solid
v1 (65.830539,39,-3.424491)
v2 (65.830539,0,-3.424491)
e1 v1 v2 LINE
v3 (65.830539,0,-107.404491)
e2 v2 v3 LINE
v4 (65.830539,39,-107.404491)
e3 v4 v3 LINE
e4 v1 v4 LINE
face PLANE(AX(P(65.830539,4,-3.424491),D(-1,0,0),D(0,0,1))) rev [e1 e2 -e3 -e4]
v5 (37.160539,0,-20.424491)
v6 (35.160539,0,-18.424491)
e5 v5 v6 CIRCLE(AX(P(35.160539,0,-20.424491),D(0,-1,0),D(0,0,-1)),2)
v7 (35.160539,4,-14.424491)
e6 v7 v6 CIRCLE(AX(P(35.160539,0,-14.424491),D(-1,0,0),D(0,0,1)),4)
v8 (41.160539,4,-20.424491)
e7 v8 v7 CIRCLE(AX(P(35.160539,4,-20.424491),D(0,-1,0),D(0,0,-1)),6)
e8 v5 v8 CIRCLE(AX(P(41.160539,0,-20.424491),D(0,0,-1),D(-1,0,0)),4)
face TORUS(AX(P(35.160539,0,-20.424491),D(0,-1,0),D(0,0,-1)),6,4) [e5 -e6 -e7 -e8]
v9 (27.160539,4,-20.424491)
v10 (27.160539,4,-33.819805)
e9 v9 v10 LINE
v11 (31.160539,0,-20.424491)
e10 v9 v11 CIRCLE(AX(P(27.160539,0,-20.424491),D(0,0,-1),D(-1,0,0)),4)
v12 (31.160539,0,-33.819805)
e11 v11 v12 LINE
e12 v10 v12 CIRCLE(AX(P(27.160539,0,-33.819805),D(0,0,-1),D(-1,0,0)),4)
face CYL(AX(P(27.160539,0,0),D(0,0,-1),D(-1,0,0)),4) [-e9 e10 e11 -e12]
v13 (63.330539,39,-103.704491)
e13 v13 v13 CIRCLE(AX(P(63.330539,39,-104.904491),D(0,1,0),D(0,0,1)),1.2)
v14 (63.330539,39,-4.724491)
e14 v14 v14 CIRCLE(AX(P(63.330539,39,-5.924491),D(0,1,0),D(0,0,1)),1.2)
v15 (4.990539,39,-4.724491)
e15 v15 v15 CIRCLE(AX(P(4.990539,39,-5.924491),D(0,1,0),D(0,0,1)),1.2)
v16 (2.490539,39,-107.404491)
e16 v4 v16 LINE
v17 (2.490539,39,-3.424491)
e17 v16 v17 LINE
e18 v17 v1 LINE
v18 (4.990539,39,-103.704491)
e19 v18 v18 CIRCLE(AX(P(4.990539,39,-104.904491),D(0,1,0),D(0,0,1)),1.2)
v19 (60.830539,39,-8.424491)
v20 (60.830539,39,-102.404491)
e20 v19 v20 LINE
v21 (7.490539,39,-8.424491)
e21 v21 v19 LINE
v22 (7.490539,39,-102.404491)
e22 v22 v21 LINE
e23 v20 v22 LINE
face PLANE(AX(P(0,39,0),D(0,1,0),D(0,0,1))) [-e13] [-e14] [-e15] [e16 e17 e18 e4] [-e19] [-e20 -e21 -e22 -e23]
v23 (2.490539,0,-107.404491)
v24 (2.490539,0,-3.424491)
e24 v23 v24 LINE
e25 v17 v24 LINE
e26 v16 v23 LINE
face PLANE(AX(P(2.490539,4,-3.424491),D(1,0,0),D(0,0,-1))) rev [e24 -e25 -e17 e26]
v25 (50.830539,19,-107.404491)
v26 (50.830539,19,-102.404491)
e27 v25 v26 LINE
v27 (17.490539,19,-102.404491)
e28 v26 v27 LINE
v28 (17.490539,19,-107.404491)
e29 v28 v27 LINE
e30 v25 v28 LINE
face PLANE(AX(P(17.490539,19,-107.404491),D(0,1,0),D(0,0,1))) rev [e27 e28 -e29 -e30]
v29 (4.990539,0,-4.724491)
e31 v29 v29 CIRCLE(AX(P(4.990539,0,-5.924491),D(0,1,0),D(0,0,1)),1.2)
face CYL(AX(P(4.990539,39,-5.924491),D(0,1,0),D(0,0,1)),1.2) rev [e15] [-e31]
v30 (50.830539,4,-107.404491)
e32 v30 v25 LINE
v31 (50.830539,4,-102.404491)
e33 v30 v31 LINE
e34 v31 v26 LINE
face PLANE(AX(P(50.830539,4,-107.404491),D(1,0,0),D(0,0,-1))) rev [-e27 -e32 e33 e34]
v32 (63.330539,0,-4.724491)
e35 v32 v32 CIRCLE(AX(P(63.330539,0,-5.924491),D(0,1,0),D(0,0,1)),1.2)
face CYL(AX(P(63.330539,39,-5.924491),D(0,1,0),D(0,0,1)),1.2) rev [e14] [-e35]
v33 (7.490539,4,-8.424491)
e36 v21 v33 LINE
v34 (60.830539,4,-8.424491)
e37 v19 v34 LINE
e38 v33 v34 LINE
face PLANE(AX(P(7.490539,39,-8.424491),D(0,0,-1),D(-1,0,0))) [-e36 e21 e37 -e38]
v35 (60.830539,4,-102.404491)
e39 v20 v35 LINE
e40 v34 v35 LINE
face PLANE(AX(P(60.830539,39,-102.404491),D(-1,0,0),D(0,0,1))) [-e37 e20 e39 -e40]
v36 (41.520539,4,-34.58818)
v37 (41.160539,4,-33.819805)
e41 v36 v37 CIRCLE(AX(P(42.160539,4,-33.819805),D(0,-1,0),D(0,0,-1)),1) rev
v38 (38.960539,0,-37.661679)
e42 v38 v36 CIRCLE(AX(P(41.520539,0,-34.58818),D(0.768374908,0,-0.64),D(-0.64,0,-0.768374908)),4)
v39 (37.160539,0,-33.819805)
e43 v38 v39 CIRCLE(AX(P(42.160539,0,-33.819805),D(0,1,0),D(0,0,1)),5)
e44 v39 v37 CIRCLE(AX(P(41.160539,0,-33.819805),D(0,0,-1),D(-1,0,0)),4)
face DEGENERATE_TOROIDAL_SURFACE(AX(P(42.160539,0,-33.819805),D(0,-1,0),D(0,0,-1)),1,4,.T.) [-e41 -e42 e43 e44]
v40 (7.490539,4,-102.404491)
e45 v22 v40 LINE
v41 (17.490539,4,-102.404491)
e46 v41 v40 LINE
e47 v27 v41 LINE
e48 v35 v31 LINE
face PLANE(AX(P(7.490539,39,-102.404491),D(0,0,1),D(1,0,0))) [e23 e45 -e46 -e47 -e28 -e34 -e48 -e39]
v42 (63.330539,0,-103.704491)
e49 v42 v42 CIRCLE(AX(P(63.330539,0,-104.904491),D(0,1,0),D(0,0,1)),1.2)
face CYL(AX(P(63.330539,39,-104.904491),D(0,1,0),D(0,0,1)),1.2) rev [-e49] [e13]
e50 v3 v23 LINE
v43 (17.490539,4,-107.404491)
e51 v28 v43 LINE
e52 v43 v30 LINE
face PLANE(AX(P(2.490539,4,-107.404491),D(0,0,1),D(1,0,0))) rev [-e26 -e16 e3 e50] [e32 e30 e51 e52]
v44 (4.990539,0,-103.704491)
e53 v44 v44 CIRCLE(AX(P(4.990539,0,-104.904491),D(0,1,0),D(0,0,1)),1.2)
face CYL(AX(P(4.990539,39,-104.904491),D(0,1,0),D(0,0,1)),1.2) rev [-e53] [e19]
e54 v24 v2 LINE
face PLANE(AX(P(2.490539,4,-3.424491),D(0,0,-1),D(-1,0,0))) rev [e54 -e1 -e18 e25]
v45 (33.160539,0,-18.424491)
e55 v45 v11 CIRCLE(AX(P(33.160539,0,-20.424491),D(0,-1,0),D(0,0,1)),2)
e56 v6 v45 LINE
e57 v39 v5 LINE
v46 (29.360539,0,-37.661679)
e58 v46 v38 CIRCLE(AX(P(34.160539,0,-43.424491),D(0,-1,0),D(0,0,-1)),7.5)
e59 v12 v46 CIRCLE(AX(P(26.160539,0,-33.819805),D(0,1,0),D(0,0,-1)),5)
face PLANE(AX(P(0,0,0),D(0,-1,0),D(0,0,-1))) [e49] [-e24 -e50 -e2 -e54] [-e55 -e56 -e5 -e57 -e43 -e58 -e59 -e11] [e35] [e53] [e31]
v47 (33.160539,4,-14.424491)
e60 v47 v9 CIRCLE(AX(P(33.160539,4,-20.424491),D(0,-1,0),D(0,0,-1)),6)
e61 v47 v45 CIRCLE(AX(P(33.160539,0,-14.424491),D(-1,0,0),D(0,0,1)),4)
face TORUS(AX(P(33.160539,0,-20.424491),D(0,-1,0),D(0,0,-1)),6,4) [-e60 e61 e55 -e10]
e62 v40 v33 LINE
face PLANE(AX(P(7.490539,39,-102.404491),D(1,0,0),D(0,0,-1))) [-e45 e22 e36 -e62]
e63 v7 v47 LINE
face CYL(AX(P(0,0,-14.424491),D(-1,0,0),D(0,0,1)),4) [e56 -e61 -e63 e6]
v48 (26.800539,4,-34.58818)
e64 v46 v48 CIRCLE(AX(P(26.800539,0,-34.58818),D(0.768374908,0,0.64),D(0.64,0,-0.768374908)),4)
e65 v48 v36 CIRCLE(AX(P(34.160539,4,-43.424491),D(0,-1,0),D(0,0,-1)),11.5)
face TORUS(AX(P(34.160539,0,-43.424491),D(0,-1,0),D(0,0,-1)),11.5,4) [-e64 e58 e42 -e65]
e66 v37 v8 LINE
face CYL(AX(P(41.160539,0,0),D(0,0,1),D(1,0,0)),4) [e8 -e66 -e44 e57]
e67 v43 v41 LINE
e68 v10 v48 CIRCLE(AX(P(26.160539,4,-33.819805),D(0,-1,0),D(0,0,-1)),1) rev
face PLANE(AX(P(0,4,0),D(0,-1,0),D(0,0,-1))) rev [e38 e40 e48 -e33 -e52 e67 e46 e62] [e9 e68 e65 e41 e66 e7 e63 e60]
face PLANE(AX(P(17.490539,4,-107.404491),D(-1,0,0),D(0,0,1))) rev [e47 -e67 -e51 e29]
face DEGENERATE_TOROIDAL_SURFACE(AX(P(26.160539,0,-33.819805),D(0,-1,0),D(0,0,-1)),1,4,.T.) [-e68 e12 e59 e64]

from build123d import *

# Parameters (mm, degrees)
SCHIZZO1_W                   = 63.34
SCHIZZO1_H                   = 103.98
ESTRUSIONE_ESTRUSIONE1_DEPTH = 4
SCHIZZO2_W                   = 63.34
SCHIZZO2_H                   = 103.98
SCHIZZO2_W_2                 = 53.34
SCHIZZO2_H_2                 = 93.98
ESTRUSIONE_ESTRUSIONE2_DEPTH = 35
FORO_PER_VITE_M2_1_D         = 2.4
SCHIZZO5_W                   = 33.34
SCHIZZO5_H                   = 15
TAGLIO_ESTRUSIONE1_DEPTH     = 126.106755432
TAGLIO_ESTRUSIONE2_DEPTH     = 132.87260726
RACCORDO1_R                  = 4


with BuildPart() as part:
    # Schizzo1 → Estrusione-Estrusione1 (new body)
    with BuildSketch(Plane(origin=(0, 0, 0), x_dir=(1, 0, 0), z_dir=(0, 1, 0))):
        with Locations((34.160538922, 55.414491018)):
            Rectangle(SCHIZZO1_W, SCHIZZO1_H)
    extrude(amount=ESTRUSIONE_ESTRUSIONE1_DEPTH)

    # Schizzo2 → Estrusione-Estrusione2 (add)
    with BuildSketch(Plane(origin=(0, 4, 0), x_dir=(1, 0, 0), z_dir=(0, 1, 0))):
        with Locations((34.160538922, 55.414491018)):
            Rectangle(SCHIZZO2_W, SCHIZZO2_H)
        with Locations((34.160538922, 55.414491018)):
            Rectangle(SCHIZZO2_W_2, SCHIZZO2_H_2, mode=Mode.SUBTRACT)
    extrude(amount=ESTRUSIONE_ESTRUSIONE2_DEPTH)

    # Foro per Vite M2-1 (through all)
    with Locations(Plane(origin=(0, 39, 0), x_dir=(1, 0, 0), z_dir=(0, 1, 0))):
        with Locations((4.990538922, 104.904491018), (63.330538922, 104.904491018), (63.330538922, 5.924491018), (4.990538922, 5.924491018)):
            Hole(FORO_PER_VITE_M2_1_D / 2)

    # Schizzo5 → Taglio-Estrusione1 (cut, through all)
    with BuildSketch(Plane.XY.offset(-102.404491018)):
        with Locations((34.160538922, 11.5)):
            Rectangle(SCHIZZO5_W, SCHIZZO5_H)
    extrude(amount=-TAGLIO_ESTRUSIONE1_DEPTH, mode=Mode.SUBTRACT)

    # Schizzo6 → Taglio-Estrusione2 (cut, through all)
    with BuildSketch(Plane(origin=(0, 0, 0), x_dir=(-1, 0, 0), z_dir=(0, -1, 0))):
        with BuildLine():
            Line((-31.160538922, 33.819804662), (-31.160538922, 20.424491018))
            ThreePointArc((-31.160538922, 20.424491018), (-31.74632536, 19.010277456), (-33.160538922, 18.424491018))
            Line((-33.160538922, 18.424491018), (-35.160538922, 18.424491018))
            ThreePointArc((-35.160538922, 18.424491018), (-36.574752485, 19.010277456), (-37.160538922, 20.424491018))
            Line((-37.160538922, 20.424491018), (-37.160538922, 33.819804662))
            ThreePointArc((-37.160538922, 33.819804662), (-37.632846353, 35.941125005), (-38.960538922, 37.661679204))
            ThreePointArc((-38.960538922, 37.661679204), (-34.160538922, 50.924491018), (-29.360538922, 37.661679204))
            ThreePointArc((-29.360538922, 37.661679204), (-30.688231491, 35.941125005), (-31.160538922, 33.819804662))
        make_face()
    extrude(amount=-TAGLIO_ESTRUSIONE2_DEPTH, mode=Mode.SUBTRACT)

    # Raccordo1
    raccordo1_edges = [part.edges().sort_by_distance(p)[0] for p in [
        (30.688231491, 4, -35.941125005),
        (31.160538922, 4, -27.12214784),
        (31.74632536, 4, -19.010277456),
        (34.160538922, 4, -18.424491018),
        (36.574752485, 4, -19.010277456),
        (37.160538922, 4, -27.12214784),
        (37.632846353, 4, -35.941125005),
        (34.160538922, 4, -50.924491018),
    ]]
    fillet(raccordo1_edges, radius=RACCORDO1_R - 0.0001)  # a hair under: the kernel refuses the full size


solid = part.part
